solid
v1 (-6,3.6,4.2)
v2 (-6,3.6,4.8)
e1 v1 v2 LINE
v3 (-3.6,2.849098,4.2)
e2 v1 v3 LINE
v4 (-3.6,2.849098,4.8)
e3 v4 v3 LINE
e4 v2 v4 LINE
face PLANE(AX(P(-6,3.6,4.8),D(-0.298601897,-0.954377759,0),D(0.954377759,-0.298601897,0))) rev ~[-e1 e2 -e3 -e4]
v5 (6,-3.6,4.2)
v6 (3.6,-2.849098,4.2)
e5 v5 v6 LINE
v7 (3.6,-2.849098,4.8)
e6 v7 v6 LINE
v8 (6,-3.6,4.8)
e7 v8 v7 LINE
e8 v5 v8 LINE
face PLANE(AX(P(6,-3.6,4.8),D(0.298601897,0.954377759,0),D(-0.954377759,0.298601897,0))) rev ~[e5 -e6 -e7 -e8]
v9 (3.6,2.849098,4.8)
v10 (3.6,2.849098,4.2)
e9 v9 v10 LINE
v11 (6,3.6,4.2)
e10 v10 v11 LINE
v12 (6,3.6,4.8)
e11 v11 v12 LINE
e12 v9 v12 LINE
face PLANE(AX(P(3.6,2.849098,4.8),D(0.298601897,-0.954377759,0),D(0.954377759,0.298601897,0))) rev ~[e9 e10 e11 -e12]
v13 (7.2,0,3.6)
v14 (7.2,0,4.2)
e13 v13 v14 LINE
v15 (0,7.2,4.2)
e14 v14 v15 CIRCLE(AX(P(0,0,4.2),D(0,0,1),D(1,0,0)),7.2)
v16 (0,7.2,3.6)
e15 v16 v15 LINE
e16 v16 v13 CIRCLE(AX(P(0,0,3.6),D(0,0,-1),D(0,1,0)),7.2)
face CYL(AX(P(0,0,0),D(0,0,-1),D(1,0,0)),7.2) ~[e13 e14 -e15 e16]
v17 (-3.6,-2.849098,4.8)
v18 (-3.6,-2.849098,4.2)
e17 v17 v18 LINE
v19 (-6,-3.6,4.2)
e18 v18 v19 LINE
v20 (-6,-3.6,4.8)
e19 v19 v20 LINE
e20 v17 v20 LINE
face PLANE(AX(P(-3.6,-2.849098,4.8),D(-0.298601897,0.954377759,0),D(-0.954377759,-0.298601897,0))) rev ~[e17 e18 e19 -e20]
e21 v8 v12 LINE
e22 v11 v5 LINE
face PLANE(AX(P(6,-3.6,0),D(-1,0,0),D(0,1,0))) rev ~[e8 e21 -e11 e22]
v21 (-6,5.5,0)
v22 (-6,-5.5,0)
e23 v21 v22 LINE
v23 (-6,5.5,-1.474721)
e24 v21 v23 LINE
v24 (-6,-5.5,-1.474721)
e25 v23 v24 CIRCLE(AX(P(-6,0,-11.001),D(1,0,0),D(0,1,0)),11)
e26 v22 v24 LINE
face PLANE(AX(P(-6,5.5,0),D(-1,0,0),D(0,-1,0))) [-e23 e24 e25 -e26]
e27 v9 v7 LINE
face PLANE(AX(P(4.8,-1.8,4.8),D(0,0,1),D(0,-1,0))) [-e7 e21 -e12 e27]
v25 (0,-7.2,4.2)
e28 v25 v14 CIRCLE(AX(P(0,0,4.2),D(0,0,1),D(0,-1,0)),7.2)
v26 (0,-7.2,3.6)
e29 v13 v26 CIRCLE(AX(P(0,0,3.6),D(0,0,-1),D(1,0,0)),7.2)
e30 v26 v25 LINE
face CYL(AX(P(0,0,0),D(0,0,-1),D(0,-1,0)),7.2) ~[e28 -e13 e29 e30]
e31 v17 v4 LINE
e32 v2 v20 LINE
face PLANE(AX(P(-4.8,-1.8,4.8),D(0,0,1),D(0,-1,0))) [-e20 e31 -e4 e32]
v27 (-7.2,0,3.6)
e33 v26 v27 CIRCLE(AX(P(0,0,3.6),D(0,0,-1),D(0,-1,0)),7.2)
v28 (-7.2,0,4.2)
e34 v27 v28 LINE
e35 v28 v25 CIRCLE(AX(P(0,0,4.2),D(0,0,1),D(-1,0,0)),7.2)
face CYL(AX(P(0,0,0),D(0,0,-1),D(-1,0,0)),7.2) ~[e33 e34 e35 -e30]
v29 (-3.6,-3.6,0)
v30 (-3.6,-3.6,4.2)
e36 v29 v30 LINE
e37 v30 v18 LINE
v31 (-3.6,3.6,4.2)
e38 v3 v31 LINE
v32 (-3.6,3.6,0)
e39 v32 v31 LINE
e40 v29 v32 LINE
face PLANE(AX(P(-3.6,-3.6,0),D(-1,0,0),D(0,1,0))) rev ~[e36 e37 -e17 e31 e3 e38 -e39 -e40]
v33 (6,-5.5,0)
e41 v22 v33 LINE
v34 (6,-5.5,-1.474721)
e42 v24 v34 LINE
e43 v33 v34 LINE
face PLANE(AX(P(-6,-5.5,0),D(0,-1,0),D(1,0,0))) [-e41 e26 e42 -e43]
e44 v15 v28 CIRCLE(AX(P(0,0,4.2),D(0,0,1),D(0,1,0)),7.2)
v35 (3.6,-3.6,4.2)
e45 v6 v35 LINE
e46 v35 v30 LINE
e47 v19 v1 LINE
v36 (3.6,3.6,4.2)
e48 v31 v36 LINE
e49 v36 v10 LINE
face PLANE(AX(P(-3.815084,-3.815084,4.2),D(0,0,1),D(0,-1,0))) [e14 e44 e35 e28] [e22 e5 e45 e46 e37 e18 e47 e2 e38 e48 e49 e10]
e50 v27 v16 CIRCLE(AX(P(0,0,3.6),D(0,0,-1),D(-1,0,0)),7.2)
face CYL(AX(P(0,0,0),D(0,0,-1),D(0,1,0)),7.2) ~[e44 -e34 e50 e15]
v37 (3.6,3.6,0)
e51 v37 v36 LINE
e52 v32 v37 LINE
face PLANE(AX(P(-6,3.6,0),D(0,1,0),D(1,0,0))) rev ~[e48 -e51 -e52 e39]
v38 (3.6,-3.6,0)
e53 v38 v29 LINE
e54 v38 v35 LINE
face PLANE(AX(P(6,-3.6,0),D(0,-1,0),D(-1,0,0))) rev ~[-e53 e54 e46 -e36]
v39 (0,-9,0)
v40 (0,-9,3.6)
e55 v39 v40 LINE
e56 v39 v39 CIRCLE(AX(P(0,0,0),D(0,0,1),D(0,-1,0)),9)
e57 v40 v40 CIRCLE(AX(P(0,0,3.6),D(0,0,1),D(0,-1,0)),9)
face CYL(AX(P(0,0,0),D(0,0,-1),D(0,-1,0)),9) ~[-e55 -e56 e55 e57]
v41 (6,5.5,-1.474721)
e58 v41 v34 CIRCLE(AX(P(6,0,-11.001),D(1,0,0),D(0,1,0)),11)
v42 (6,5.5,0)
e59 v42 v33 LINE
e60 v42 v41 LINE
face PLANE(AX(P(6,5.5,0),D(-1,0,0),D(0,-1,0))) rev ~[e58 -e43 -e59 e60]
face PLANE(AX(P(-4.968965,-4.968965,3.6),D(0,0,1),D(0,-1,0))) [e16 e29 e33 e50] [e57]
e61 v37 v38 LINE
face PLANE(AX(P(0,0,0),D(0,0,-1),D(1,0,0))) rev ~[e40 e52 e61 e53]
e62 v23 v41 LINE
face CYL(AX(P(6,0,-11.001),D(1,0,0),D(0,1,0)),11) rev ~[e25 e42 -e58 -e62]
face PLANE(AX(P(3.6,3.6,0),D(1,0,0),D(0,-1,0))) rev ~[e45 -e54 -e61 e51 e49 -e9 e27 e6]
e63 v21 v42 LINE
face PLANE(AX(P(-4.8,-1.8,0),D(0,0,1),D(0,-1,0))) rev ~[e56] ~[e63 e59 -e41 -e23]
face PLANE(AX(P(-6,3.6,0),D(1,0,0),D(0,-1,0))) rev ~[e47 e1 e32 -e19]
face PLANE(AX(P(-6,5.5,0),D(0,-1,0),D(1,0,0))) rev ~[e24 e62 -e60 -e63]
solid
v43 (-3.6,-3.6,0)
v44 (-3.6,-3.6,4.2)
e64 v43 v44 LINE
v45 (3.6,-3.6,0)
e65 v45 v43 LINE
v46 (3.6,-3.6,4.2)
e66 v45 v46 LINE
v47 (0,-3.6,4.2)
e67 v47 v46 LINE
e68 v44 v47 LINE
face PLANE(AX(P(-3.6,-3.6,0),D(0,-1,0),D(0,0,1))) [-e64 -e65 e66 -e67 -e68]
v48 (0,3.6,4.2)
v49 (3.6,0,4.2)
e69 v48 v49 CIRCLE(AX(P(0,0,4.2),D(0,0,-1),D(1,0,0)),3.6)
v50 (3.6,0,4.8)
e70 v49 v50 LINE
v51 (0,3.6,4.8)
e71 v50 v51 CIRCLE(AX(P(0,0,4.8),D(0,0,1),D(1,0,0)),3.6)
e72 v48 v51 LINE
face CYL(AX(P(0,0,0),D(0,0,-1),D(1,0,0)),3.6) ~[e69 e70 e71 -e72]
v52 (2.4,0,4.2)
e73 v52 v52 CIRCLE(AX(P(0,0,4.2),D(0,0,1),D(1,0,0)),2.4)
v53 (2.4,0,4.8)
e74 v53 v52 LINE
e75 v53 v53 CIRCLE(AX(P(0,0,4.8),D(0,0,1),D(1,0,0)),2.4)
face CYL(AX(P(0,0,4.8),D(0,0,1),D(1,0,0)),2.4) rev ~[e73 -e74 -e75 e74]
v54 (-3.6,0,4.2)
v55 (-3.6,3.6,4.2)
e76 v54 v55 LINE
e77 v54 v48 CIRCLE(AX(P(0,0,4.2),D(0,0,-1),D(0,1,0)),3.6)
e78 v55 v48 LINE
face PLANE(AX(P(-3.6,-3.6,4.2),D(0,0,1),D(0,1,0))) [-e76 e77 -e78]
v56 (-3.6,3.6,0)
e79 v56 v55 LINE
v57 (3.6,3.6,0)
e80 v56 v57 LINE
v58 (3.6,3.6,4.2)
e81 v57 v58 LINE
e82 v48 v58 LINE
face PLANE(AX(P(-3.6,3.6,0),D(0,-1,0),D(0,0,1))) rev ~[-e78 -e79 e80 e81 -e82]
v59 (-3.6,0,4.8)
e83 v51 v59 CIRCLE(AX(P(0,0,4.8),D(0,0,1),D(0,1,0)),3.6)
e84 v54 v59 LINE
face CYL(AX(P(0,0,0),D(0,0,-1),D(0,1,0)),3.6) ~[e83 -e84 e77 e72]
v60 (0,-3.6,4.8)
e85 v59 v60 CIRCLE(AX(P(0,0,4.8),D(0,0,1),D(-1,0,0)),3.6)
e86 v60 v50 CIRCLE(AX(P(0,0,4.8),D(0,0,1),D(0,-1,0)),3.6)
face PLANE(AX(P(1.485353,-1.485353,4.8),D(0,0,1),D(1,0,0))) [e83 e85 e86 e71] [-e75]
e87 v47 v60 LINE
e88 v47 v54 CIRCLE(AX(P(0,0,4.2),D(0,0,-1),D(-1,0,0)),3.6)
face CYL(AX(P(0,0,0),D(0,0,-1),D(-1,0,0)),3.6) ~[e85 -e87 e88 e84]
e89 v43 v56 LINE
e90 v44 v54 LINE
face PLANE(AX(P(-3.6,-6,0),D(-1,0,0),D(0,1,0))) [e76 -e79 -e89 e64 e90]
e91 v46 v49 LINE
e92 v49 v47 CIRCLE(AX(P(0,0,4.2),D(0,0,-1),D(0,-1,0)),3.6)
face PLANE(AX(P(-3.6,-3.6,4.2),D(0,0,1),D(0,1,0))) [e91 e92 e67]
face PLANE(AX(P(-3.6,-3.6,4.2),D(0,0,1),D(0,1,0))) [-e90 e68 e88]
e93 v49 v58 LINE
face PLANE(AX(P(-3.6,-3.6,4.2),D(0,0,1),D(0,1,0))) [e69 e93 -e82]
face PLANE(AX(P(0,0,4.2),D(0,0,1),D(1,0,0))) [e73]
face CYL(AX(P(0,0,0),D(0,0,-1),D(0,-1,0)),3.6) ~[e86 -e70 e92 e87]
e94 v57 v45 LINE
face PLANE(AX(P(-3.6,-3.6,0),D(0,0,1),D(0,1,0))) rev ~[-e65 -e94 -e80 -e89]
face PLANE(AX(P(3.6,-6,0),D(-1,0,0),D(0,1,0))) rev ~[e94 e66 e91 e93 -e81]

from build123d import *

# Parameters (mm, degrees)
F1_DEPTH  = 3
F2_DEPTH  = 3.5
F3_DEPTH  = 4
F0_W      = 3
F0_H      = 2
F7_DEPTH  = 6
F8_R      = 2
F9_DEPTH  = 0.5
F11_DEPTH = 3.5
F13_SCALE = 1.2
F14_ANGLE = 90
F15_W     = 12
F15_H     = 11
F16_DEPTH = 11
F17_R     = 11
F18_DEPTH = 12
F20_DEPTH = 0.6


# Not quite as in the source:
# - a feature of the source that left no trace in its solid (it failed there, or was rolled back) is left out


with BuildPart() as f1:
    # F0 (on Top) → F1 (new body)
    with BuildSketch(Plane.XY):
        with BuildLine():
            ThreePointArc((0, -7.5), (5.3033008589, -5.3033008589), (7.5, 0))
            Line((7.5, 0), (6, 0))
            ThreePointArc((6, 0), (4.2426406871, -4.2426406871), (0, -6))
            Line((0, -6), (0, -7.5))
        make_face()
        with BuildLine():
            ThreePointArc((-7.5, 0), (-5.3033008589, -5.3033008589), (0, -7.5))
            Line((0, -7.5), (0, -6))
            ThreePointArc((0, -6), (-4.2426406871, -4.2426406871), (-6, 0))
            Line((-6, 0), (-7.5, 0))
        make_face()
        with BuildLine():
            Line((0, 6), (0, 7.5))
            ThreePointArc((0, 7.5), (-5.3033008589, 5.3033008589), (-7.5, 0))
            Line((-7.5, 0), (-6, 0))
            ThreePointArc((-6, 0), (-4.2426406871, 4.2426406871), (0, 6))
        make_face()
        with BuildLine():
            Line((6, 0), (7.5, 0))
            ThreePointArc((7.5, 0), (5.3033008589, 5.3033008589), (0, 7.5))
            Line((0, 7.5), (0, 6))
            ThreePointArc((0, 6), (4.2426406871, 4.2426406871), (6, 0))
        make_face()
    extrude(amount=F1_DEPTH)

    # F0 (on Top) → F2 (join)
    with BuildSketch(Plane.XY):
        with BuildLine():
            ThreePointArc((0, -6), (4.2426406871, -4.2426406871), (6, 0))
            Line((6, 0), (3, 0))
            Line((3, 0), (3, -3))
            Line((3, -3), (3, -5))
            Line((3, -5), (0, -5))
            Line((0, -5), (0, -6))
        make_face()
        with BuildLine():
            Line((3, 0), (6, 0))
            ThreePointArc((6, 0), (4.2426406871, 4.2426406871), (0, 6))
            Line((0, 6), (0, 5))
            Line((0, 5), (3, 5))
            Line((3, 5), (3, 3))
            Line((3, 3), (3, 0))
        make_face()
        with BuildLine():
            Line((0, 5), (0, 6))
            ThreePointArc((0, 6), (-4.2426406871, 4.2426406871), (-6, 0))
            Line((-6, 0), (-3, 0))
            Line((-3, 0), (-3, 3))
            Line((-3, 3), (-3, 5))
            Line((-3, 5), (0, 5))
        make_face()
        with BuildLine():
            ThreePointArc((-6, 0), (-4.2426406871, -4.2426406871), (0, -6))
            Line((0, -6), (0, -5))
            Line((0, -5), (-3, -5))
            Line((-3, -5), (-3, -3))
            Line((-3, -3), (-3, 0))
            Line((-3, 0), (-6, 0))
        make_face()
    extrude(amount=F2_DEPTH)

    # F0 (on Top) → F3, piece 2 (join)
    with BuildSketch(Plane.XY):
        with Locations((1.5, -4)):
            Rectangle(F0_W, F0_H)
        with Locations((-1.5, -4)):
            Rectangle(F0_W, F0_H)
        with Locations((1.5, 4)):
            Rectangle(F0_W, F0_H)
        with Locations((-1.5, 4)):
            Rectangle(F0_W, F0_H)
    extrude(amount=F3_DEPTH)


with BuildPart() as f3:
    # F0 (on Top) → F3 (new body)
    with BuildSketch(Plane.XY):
        with BuildLine():
            ThreePointArc((0, -3), (2.1213203436, -2.1213203436), (3, 0))
            Line((3, 0), (0, 0))
            Line((0, 0), (0, -3))
        make_face()
        with BuildLine():
            ThreePointArc((-3, 0), (-2.1213203436, -2.1213203436), (0, -3))
            Line((0, -3), (0, 0))
            Line((0, 0), (-3, 0))
        make_face()
        with BuildLine():
            Line((0, 0), (0, 3))
            ThreePointArc((0, 3), (-2.1213203436, 2.1213203436), (-3, 0))
            Line((-3, 0), (0, 0))
        make_face()
        with BuildLine():
            Line((0, 0), (3, 0))
            ThreePointArc((3, 0), (2.1213203436, 2.1213203436), (0, 3))
            Line((0, 3), (0, 0))
        make_face()
    extrude(amount=F3_DEPTH)

    # F7 (add): a face of the model
    f7_faces = [f1.part.faces().sort_by_distance(p)[0] for p in [
        (-3, 0, 1.75),
    ]]
    extrude(f7_faces, amount=F7_DEPTH)

    # F8 (on face) → F9 (cut)
    with BuildSketch(Plane.XY.offset(4)):
        Circle(F8_R)
    extrude(amount=-F9_DEPTH, mode=Mode.SUBTRACT)


with BuildPart() as f11:
    # F10 (on Top) → F11 (new body)
    with BuildSketch(Plane.XY):
        with BuildLine():
            ThreePointArc((-24.2659887299, 12.9090552479), (-26.3873090735, 13.7877349043), (-27.2659887299, 15.9090552479))
            Line((-27.2659887299, 15.9090552479), (-27.2659887299, 12.9090552479))
            Line((-27.2659887299, 12.9090552479), (-24.2659887299, 12.9090552479))
        make_face()
    extrude(amount=-F11_DEPTH)


with BuildPart() as f11b:
    # F10 (on Top) → F11, piece 2 (new body)
    with BuildSketch(Plane.XY):
        with BuildLine():
            Line((-21.2659887299, 12.9090552479), (-21.2659887299, 15.9090552479))
            ThreePointArc((-21.2659887299, 15.9090552479), (-22.1446683863, 13.7877349043), (-24.2659887299, 12.9090552479))
            Line((-24.2659887299, 12.9090552479), (-21.2659887299, 12.9090552479))
        make_face()
    extrude(amount=-F11_DEPTH)


with BuildPart() as f11c:
    # F10 (on Top) → F11, piece 3 (new body)
    with BuildSketch(Plane.XY):
        with BuildLine():
            Line((-21.2659887299, 18.9090552479), (-24.2659887299, 18.9090552479))
            ThreePointArc((-24.2659887299, 18.9090552479), (-22.1446683863, 18.0303755915), (-21.2659887299, 15.9090552479))
            Line((-21.2659887299, 15.9090552479), (-21.2659887299, 18.9090552479))
        make_face()
    extrude(amount=-F11_DEPTH)


with BuildPart() as f11d:
    # F10 (on Top) → F11, piece 4 (new body)
    with BuildSketch(Plane.XY):
        with BuildLine():
            Line((-24.2659887299, 18.9090552479), (-27.2659887299, 18.9090552479))
            Line((-27.2659887299, 18.9090552479), (-27.2659887299, 15.9090552479))
            ThreePointArc((-27.2659887299, 15.9090552479), (-26.3873090735, 18.0303755915), (-24.2659887299, 18.9090552479))
        make_face()
    extrude(amount=-F11_DEPTH)


with BuildPart() as f1_1:
    # F13: moved
    add(f1.part.scale(F13_SCALE))


with BuildPart() as f3_1:
    # F13: moved
    add(f3.part.scale(F13_SCALE))


with BuildPart() as f1_2:
    # F14: moved
    add(f1_1.part.rotate(Axis((0, 0, 3.6), (0, 0, -1)), F14_ANGLE))

    # F15 (on face) → F16 (join)
    with BuildSketch(Plane(origin=(0, 0, 0), x_dir=(1, 0, 0), z_dir=(0, 0, -1))):
        Rectangle(F15_W, F15_H)
    extrude(amount=F16_DEPTH)

    # F17 (on face) → F18 (cut, through all)
    with BuildSketch(Plane.YZ.offset(6)):
        with Locations((0, -11.001)):
            Circle(F17_R)
    extrude(amount=-F18_DEPTH, mode=Mode.SUBTRACT)

    # F19 (on face) → F20 (cut, through all)
    with BuildSketch(Plane.XY.offset(4.8)):
        Polygon((3.6, 2.8490975965), (6, 3.6), (3.6, 3.6), align=None)
        Polygon((3.6, -3.6), (6, -3.6), (3.6, -2.8490975965), align=None)
        Polygon((-3.6, -2.8490975965), (-6, -3.6), (-3.6, -3.6), align=None)
        Polygon((-3.6, 3.6), (-6, 3.6), (-3.6, 2.8490975965), align=None)
    extrude(amount=-F20_DEPTH, mode=Mode.SUBTRACT)


solid = Compound([f3_1.part, f1_2.part])
